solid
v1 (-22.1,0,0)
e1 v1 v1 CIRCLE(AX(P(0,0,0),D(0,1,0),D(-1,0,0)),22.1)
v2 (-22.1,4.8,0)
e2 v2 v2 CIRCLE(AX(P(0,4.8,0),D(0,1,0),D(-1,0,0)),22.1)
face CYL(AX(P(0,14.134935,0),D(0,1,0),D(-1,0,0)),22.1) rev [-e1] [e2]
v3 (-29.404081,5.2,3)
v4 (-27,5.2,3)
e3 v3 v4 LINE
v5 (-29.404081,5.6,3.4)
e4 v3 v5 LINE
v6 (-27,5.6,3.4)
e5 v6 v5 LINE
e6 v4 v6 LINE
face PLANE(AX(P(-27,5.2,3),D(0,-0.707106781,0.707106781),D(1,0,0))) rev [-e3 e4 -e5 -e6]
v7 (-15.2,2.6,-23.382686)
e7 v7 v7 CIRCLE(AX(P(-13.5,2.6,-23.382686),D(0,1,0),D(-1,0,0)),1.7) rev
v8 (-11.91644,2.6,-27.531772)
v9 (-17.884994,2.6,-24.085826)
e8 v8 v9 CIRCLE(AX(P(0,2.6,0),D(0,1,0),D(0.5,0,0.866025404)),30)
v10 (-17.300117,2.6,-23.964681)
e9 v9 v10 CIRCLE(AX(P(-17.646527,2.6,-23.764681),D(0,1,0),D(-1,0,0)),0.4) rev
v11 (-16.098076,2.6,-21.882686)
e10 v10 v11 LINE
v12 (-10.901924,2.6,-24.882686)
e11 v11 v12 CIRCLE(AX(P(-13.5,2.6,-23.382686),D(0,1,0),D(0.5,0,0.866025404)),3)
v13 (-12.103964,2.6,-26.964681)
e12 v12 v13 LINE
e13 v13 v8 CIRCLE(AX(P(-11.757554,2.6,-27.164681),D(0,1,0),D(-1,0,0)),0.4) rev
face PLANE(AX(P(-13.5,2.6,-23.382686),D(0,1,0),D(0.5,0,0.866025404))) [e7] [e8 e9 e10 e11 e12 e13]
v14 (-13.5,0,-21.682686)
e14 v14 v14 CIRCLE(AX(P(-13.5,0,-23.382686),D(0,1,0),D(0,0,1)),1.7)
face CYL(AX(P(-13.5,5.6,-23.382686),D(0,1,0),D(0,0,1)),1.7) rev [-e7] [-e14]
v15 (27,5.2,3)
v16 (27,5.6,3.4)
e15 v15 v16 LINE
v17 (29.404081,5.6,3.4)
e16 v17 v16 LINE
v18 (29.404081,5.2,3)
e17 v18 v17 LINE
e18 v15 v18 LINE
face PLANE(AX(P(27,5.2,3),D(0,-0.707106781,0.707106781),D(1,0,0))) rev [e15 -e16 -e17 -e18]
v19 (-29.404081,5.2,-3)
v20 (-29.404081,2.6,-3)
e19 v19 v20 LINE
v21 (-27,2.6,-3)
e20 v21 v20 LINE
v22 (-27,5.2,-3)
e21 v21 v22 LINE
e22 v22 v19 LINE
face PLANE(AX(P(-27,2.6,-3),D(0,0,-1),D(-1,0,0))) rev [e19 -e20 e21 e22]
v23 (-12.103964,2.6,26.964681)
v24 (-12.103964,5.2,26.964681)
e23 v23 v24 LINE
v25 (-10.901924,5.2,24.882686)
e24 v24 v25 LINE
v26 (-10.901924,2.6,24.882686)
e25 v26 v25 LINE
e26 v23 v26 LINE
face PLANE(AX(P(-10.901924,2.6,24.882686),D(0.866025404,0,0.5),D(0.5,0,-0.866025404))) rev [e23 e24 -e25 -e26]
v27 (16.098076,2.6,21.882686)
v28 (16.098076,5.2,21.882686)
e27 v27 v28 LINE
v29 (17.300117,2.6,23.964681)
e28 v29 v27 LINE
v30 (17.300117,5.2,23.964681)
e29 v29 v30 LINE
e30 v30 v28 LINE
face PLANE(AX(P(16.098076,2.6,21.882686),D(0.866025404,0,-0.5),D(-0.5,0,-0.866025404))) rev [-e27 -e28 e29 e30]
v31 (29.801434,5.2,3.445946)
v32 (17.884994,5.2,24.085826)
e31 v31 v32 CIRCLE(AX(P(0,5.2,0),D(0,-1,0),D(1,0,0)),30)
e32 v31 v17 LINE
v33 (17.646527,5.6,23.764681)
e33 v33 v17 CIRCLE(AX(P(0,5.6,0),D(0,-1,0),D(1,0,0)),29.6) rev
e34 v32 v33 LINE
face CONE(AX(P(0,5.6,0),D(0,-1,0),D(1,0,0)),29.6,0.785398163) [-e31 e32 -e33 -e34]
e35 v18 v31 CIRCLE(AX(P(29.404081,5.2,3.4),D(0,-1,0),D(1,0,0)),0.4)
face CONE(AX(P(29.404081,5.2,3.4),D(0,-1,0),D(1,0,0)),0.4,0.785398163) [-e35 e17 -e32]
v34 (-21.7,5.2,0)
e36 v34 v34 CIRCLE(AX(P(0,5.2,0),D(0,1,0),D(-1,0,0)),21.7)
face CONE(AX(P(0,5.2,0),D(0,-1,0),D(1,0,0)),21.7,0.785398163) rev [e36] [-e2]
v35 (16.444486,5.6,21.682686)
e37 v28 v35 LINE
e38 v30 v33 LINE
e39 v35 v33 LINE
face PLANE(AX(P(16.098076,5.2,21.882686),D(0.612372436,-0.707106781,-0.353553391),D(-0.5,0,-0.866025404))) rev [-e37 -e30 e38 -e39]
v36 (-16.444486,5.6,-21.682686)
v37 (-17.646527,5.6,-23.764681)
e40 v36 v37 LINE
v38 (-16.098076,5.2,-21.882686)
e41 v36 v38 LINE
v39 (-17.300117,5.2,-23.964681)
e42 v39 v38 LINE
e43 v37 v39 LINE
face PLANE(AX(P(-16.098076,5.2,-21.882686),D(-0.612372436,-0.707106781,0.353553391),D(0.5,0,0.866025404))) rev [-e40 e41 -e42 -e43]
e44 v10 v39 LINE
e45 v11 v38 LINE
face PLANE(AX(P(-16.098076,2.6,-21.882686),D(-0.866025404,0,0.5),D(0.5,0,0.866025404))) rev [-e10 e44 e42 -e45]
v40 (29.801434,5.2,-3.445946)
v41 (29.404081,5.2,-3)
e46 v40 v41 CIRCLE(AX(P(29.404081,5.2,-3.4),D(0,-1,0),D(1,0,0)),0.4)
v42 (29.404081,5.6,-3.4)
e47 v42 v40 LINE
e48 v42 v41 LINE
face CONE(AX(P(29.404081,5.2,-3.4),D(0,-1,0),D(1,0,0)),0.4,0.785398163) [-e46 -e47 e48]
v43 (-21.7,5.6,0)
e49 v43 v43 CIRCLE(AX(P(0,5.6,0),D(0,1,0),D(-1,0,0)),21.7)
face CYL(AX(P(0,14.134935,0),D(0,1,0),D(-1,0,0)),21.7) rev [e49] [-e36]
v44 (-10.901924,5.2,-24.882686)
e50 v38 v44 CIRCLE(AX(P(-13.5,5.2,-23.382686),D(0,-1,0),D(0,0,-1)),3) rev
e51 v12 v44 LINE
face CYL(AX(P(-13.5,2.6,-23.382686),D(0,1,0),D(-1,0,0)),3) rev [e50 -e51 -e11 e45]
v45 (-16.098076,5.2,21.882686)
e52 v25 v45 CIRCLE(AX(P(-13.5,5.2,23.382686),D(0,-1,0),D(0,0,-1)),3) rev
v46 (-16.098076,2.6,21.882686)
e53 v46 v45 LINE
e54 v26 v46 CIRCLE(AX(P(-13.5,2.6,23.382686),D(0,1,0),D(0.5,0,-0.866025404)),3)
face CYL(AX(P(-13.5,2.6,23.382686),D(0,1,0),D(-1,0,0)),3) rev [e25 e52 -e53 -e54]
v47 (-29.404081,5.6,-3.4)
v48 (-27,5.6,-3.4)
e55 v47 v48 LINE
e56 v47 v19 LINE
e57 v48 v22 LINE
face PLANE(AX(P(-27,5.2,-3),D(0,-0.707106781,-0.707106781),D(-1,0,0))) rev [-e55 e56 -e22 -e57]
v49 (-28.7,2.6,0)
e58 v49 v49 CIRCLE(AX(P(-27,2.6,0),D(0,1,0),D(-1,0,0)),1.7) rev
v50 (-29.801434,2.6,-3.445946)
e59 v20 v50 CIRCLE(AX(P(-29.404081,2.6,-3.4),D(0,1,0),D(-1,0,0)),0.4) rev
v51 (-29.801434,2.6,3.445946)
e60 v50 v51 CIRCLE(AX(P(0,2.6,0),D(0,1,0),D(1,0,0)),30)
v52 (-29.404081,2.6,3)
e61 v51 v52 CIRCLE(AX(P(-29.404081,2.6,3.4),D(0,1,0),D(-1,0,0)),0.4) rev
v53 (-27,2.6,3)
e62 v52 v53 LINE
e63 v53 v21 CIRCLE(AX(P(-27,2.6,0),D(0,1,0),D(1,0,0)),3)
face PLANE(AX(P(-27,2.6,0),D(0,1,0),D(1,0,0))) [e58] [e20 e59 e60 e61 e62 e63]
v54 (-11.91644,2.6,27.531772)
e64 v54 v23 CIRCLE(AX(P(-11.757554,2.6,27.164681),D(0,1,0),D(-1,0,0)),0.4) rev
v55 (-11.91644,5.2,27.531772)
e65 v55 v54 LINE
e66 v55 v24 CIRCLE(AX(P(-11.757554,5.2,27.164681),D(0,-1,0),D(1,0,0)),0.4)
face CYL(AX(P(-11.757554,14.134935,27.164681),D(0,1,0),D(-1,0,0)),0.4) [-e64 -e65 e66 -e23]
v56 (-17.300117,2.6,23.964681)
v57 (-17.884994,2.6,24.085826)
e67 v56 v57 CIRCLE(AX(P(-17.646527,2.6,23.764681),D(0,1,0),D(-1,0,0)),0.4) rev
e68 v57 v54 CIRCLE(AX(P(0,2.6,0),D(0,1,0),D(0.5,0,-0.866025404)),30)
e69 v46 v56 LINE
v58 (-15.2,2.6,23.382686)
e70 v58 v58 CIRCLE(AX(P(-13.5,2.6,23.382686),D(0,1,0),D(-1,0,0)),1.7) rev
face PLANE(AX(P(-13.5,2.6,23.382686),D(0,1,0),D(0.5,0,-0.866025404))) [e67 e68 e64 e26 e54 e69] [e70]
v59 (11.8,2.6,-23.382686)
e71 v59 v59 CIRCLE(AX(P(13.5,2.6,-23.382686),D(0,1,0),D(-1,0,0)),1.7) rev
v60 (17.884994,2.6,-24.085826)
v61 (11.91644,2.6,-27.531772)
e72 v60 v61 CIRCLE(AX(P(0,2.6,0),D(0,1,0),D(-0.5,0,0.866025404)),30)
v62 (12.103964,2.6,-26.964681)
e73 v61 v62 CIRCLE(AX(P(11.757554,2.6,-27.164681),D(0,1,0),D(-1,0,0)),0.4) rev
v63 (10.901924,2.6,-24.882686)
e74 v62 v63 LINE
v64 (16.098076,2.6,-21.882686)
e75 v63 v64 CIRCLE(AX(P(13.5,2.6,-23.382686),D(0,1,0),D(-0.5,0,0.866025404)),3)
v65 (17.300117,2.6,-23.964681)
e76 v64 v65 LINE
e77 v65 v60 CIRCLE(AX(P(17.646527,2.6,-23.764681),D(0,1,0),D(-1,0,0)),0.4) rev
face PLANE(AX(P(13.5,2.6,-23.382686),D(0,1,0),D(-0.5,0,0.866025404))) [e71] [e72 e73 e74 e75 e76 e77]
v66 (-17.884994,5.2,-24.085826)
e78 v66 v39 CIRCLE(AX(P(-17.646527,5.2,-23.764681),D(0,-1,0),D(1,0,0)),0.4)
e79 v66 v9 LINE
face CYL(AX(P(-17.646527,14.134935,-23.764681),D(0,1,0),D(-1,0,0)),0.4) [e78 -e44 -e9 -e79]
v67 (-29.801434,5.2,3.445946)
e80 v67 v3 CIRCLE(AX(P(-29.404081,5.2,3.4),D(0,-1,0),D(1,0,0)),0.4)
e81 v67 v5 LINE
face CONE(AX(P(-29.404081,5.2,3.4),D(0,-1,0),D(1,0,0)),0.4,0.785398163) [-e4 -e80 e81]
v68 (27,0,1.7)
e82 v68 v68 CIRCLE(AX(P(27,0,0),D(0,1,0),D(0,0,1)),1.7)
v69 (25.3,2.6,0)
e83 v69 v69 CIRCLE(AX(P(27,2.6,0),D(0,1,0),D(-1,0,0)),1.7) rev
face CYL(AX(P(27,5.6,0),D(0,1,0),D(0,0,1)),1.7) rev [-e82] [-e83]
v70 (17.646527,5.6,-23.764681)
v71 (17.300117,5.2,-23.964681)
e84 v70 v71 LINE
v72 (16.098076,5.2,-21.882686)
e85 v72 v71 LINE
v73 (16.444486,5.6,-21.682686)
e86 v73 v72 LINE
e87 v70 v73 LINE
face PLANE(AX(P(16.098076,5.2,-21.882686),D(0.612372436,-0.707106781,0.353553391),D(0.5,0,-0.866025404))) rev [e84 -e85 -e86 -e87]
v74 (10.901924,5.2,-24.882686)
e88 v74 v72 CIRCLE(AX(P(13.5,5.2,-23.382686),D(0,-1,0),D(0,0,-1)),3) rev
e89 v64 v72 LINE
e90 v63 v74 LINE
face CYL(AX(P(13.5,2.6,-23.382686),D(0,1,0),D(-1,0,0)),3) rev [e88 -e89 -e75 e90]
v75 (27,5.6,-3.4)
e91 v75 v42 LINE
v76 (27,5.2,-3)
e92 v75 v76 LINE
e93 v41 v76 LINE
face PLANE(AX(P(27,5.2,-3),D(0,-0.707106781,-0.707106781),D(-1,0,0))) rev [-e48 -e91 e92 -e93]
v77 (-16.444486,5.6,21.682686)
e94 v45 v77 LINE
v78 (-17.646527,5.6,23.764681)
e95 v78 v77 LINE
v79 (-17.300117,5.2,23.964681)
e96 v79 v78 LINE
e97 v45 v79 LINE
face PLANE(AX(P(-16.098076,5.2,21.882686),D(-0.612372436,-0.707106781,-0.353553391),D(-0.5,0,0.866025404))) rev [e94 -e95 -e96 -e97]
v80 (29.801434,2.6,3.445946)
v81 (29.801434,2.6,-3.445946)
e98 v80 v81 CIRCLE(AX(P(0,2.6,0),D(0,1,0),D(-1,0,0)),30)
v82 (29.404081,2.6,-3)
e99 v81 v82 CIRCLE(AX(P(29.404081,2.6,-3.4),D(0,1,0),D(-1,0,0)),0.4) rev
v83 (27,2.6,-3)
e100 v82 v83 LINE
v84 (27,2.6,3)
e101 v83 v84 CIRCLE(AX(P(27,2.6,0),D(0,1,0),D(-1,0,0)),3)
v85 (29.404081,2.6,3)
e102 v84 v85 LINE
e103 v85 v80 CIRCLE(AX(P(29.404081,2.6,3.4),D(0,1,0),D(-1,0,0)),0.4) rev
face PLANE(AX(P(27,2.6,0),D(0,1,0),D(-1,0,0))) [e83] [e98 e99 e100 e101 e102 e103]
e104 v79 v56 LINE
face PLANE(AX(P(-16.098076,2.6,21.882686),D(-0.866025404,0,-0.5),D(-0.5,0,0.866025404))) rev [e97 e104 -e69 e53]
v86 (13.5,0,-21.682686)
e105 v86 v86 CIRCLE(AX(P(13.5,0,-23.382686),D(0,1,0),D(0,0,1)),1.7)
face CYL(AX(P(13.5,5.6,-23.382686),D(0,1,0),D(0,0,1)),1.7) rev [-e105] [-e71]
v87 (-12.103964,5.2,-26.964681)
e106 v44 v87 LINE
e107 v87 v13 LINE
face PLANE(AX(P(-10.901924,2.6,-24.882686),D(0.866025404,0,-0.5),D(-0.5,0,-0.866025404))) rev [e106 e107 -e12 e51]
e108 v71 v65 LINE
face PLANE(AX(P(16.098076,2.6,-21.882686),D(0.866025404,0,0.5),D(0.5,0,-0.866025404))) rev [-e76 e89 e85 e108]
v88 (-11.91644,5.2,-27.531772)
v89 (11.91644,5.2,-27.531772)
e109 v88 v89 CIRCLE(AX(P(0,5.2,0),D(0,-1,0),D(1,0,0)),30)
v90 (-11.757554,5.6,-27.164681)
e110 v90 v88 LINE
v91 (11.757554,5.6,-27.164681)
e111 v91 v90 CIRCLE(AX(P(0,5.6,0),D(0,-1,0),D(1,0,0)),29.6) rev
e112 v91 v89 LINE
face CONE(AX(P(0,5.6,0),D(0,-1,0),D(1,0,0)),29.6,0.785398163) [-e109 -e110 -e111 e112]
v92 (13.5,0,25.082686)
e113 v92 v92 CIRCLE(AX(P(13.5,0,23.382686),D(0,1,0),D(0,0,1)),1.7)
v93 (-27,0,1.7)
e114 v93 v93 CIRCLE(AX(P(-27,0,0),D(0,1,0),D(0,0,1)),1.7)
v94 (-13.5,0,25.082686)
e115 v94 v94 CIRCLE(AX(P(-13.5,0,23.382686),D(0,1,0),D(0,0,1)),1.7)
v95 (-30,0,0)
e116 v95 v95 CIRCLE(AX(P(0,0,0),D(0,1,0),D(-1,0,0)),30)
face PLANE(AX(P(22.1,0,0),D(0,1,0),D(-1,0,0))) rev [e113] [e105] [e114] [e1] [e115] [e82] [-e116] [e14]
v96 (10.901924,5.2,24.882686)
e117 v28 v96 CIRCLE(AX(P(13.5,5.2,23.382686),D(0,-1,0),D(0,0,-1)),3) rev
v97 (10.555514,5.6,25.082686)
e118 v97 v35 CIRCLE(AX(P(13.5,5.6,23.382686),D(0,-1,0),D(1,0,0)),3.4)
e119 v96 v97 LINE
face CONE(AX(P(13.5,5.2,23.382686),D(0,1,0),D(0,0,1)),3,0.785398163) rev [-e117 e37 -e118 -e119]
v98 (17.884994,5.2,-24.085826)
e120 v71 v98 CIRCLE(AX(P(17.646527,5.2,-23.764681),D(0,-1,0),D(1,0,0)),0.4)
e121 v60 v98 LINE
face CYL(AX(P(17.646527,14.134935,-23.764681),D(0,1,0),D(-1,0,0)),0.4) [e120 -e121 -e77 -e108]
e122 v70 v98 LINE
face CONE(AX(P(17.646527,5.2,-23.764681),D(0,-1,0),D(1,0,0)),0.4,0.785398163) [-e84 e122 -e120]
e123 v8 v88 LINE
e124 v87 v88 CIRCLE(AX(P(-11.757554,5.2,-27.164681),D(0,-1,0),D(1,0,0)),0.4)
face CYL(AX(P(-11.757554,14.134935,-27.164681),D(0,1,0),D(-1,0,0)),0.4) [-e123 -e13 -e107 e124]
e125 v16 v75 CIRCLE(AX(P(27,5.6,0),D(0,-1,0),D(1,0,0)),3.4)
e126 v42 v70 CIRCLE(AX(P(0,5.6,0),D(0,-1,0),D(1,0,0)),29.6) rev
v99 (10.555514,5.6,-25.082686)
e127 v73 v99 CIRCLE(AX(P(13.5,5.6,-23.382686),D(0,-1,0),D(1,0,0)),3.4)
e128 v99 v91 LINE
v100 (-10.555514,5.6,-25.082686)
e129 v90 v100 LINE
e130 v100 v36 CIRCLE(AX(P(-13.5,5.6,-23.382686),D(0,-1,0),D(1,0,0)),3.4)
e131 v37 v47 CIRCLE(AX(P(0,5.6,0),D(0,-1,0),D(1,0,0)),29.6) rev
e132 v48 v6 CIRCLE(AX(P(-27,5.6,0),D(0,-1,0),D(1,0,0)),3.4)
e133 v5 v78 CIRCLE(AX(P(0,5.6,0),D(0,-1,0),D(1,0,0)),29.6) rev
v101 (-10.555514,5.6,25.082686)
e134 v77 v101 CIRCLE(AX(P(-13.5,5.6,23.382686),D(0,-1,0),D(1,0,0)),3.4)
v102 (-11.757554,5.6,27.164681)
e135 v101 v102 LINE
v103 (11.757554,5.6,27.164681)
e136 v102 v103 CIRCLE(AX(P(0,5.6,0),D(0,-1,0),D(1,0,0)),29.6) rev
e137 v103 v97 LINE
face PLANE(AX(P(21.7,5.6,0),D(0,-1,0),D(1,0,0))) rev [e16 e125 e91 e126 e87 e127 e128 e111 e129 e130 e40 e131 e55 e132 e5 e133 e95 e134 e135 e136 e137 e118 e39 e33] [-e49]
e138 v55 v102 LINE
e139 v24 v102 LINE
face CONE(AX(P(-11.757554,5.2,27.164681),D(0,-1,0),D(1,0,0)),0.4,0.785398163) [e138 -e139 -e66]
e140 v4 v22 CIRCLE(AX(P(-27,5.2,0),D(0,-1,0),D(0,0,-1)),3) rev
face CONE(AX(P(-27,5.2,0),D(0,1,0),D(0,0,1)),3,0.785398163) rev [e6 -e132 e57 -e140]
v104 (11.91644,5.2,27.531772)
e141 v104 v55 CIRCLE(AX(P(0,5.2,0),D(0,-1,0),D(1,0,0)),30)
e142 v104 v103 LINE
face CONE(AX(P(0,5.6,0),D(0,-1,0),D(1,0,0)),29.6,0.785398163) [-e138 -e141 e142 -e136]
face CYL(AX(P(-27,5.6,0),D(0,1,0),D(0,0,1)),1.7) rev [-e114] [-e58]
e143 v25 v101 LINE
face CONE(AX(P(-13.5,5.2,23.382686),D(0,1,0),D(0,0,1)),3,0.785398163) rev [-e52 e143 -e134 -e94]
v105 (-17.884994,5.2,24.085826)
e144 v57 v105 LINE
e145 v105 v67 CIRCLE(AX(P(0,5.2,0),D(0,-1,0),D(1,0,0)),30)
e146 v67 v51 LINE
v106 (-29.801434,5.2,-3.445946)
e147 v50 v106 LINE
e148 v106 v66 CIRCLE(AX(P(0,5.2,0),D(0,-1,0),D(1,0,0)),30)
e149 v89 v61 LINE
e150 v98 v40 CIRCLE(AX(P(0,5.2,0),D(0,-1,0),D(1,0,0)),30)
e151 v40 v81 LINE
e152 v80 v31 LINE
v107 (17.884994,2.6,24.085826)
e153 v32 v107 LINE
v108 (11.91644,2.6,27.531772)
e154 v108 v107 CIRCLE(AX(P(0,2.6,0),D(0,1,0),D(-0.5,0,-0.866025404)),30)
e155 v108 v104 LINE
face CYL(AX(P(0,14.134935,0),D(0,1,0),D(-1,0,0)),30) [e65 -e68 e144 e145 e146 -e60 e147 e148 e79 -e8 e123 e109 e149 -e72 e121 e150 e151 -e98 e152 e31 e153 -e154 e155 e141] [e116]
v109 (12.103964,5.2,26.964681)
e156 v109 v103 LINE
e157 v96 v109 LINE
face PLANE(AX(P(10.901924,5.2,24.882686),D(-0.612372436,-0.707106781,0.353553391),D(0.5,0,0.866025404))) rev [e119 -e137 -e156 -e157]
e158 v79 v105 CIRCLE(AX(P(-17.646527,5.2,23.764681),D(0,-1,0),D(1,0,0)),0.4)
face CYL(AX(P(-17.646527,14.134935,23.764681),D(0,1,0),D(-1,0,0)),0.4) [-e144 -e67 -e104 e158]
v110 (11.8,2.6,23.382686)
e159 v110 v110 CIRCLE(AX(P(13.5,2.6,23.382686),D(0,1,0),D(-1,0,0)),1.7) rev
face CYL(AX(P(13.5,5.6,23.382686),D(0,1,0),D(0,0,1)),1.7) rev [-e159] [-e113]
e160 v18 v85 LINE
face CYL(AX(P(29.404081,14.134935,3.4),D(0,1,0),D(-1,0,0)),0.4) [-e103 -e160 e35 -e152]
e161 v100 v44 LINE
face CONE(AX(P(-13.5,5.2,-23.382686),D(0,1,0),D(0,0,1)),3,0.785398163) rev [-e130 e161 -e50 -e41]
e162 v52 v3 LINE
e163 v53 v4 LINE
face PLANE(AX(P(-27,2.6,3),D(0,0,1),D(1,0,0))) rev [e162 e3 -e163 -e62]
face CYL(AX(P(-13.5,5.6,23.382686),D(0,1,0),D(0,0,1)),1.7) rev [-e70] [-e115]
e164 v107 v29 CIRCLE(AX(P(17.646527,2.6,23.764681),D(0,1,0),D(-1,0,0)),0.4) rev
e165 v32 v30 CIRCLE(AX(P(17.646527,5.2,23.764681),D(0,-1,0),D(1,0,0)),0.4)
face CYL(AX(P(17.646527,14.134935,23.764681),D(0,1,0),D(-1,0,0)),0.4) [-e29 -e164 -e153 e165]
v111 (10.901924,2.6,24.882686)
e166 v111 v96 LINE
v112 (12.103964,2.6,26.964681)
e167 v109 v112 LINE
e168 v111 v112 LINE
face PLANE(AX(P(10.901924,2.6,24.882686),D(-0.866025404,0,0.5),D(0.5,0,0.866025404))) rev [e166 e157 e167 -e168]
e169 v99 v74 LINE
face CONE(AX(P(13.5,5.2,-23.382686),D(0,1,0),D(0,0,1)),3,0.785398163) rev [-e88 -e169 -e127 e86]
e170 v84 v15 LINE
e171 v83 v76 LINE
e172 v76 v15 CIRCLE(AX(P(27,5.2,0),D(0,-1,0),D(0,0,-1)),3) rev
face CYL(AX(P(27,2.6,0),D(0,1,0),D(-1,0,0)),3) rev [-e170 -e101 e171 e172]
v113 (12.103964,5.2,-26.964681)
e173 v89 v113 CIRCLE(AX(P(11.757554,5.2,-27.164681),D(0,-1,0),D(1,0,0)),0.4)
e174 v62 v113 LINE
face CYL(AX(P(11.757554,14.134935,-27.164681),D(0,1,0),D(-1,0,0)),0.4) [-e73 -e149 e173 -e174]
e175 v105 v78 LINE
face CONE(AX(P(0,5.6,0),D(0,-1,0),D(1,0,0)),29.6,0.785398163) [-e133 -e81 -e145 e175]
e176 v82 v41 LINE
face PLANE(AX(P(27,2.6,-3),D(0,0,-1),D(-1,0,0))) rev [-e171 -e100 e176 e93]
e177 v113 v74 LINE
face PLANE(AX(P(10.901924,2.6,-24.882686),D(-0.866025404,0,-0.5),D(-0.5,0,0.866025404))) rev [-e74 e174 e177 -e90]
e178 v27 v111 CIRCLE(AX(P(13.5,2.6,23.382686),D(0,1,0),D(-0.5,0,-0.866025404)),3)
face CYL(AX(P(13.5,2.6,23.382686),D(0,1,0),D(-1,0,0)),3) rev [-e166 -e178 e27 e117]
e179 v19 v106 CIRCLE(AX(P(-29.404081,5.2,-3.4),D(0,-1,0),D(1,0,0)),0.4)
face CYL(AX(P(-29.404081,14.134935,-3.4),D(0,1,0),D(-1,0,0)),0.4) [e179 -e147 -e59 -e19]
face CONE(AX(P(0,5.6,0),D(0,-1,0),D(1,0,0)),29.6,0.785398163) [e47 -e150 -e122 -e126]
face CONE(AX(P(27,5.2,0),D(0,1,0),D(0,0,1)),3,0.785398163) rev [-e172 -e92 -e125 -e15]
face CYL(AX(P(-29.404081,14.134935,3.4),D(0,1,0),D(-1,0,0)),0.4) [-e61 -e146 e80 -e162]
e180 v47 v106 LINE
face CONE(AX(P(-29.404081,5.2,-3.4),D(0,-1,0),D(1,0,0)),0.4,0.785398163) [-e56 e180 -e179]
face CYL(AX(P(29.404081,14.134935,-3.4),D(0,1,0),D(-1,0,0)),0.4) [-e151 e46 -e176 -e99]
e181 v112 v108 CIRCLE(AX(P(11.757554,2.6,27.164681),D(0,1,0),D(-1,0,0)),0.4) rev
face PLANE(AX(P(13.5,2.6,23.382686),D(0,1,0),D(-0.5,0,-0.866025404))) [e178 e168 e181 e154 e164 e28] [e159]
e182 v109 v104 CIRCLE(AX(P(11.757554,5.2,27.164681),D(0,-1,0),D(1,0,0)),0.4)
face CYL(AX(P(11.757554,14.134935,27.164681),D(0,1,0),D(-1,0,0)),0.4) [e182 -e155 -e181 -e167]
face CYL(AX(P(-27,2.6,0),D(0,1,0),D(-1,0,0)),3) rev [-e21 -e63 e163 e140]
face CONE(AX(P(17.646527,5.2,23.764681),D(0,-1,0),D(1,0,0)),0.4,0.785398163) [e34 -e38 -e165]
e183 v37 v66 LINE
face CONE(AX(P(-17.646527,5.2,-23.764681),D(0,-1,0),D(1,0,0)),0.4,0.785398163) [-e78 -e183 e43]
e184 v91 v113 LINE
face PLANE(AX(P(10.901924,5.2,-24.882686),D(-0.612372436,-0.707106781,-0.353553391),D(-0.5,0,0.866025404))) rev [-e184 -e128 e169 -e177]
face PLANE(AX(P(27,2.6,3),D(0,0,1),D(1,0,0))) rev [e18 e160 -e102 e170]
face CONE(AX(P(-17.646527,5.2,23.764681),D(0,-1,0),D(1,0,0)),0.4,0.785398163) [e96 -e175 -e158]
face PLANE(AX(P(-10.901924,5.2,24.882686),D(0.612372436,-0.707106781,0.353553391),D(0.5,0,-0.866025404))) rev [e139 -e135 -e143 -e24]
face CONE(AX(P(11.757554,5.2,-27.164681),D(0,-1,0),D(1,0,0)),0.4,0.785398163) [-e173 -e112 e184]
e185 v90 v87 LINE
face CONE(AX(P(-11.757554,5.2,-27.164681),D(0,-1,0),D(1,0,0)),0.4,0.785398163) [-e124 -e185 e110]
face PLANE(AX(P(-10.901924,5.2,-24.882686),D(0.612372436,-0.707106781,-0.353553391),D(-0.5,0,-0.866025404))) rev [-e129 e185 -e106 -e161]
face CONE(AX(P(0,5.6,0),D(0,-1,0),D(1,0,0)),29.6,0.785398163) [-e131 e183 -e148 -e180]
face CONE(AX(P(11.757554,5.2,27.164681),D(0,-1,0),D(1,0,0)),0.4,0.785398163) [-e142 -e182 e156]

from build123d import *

# Parameters (mm, degrees)
M3_CLEARANCE_HOLE1_D = 3.4
CUT_EXTRUDE1_DEPTH   = 3
CIRPATTERN1_COUNT    = 6
FILLET2_R            = 0.4
CHAMFER1_SIZE        = 0.4


with BuildPart() as part:
    # Sketch5 → Revolve1 (revolve)
    with BuildSketch(Plane.XY, mode=Mode.PRIVATE) as revolve1_sk:
        Polygon((22.1, 0), (30, 0), (30, 5.6), (21.7, 5.6), (21.7, 5.2), (22.1, 4.8), align=None)
    revolve(revolve1_sk.sketch.rotate(Axis((0, 14.134935251, 0), (0, -1, 0)), 180), axis=Axis((0, 14.134935251, 0), (0, -1, 0)))

    # M3 Clearance Hole1 (through all)
    with Locations(Plane(origin=(0, 5.6, 0), x_dir=(1, 0, 0), z_dir=(0, 1, 0))):
        with Locations((27, 0)):
            m3_clearance_hole1 = Hole(M3_CLEARANCE_HOLE1_D / 2)

    # Sketch4 → Cut-Extrude1 (cut)
    with BuildSketch(Plane(origin=(0, 5.6, 0), x_dir=(1, 0, 0), z_dir=(0, 1, 0))):
        with BuildLine():
            Line((27, 3), (29.849623113, 3))
            ThreePointArc((29.849623113, 3), (30, 0), (29.849623113, -3))
            Line((29.849623113, -3), (27, -3))
            ThreePointArc((27, -3), (24, 0), (27, 3))
        make_face()
    cut_extrude1 = extrude(amount=-CUT_EXTRUDE1_DEPTH, mode=Mode.SUBTRACT)

    # CirPattern1: M3 Clearance Hole1, Cut-Extrude1 ×6 about axis
    cirpattern1_axis = Axis((0, 0, 0), (0, 1, 0))
    add([m3_clearance_hole1.rotate(cirpattern1_axis, i * 360 / CIRPATTERN1_COUNT) for i in range(1, CIRPATTERN1_COUNT)], mode=Mode.SUBTRACT)
    add([cut_extrude1.rotate(cirpattern1_axis, i * 360 / CIRPATTERN1_COUNT) for i in range(1, CIRPATTERN1_COUNT)], mode=Mode.SUBTRACT)

    # Fillet2
    fillet2_edges = [part.edges().sort_by_distance(p)[0] for p in [
        (-29.849623113, 4.1, 3),
        (-29.849623113, 4.1, -3),
        (-17.522887768, 4.1, -24.350531909),
        (-12.326735345, 4.1, -27.350531909),
        (12.326735345, 4.1, -27.350531909),
        (17.522887768, 4.1, -24.350531909),
        (29.849623113, 4.1, -3),
        (29.849623113, 4.1, 3),
        (17.522887768, 4.1, 24.350531909),
        (12.326735345, 4.1, 27.350531909),
        (-12.326735345, 4.1, 27.350531909),
        (-17.522887768, 4.1, 24.350531909),
    ]]
    fillet(fillet2_edges, radius=FILLET2_R)

    # Chamfer1
    chamfer1_edges = [part.edges().sort_by_distance(p)[0] for p in [
        (-24, 5.6, 0),
        (-28.202040675, 5.6, -3),
        (-12, 5.6, -20.784609691),
        (-11.502944126, 5.6, -25.923683663),
        (12, 5.6, -20.784609691),
        (16.699096549, 5.6, -22.923683663),
        (-11.502944126, 5.6, 25.923683663),
        (16.699096549, 5.6, 22.923683663),
        (25.980762114, 5.6, 15),
        (28.202040675, 5.6, -3),
        (25.980762114, 5.6, -15),
        (11.502944126, 5.6, -25.923683663),
        (0, 5.6, -30),
        (-16.699096549, 5.6, -22.923683663),
        (-25.980762114, 5.6, -15),
        (-28.202040675, 5.6, 3),
        (-25.980762114, 5.6, 15),
        (0, 5.6, 30),
        (17.565397878, 5.6, 24.156367596),
        (12.137329062, 5.6, 27.290264588),
        (29.702726941, 5.6, 3.133896992),
        (29.702726941, 5.6, -3.133896992),
        (17.565397878, 5.6, -24.156367596),
        (12.137329062, 5.6, -27.290264588),
        (-12.137329062, 5.6, -27.290264588),
        (-17.565397878, 5.6, -24.156367596),
        (-29.702726941, 5.6, -3.133896992),
        (-29.702726941, 5.6, 3.133896992),
        (-17.565397878, 5.6, 24.156367596),
        (-12.137329062, 5.6, 27.290264588),
        (24, 5.6, 0),
        (28.202040675, 5.6, 3),
        (12, 5.6, 20.784609691),
        (11.502944126, 5.6, 25.923683663),
        (-12, 5.6, 20.784609691),
        (-16.699096549, 5.6, 22.923683663),
    ]]
    chamfer(chamfer1_edges, length=CHAMFER1_SIZE - 0.0001)  # a hair under: the kernel refuses the full size


solid = part.part
